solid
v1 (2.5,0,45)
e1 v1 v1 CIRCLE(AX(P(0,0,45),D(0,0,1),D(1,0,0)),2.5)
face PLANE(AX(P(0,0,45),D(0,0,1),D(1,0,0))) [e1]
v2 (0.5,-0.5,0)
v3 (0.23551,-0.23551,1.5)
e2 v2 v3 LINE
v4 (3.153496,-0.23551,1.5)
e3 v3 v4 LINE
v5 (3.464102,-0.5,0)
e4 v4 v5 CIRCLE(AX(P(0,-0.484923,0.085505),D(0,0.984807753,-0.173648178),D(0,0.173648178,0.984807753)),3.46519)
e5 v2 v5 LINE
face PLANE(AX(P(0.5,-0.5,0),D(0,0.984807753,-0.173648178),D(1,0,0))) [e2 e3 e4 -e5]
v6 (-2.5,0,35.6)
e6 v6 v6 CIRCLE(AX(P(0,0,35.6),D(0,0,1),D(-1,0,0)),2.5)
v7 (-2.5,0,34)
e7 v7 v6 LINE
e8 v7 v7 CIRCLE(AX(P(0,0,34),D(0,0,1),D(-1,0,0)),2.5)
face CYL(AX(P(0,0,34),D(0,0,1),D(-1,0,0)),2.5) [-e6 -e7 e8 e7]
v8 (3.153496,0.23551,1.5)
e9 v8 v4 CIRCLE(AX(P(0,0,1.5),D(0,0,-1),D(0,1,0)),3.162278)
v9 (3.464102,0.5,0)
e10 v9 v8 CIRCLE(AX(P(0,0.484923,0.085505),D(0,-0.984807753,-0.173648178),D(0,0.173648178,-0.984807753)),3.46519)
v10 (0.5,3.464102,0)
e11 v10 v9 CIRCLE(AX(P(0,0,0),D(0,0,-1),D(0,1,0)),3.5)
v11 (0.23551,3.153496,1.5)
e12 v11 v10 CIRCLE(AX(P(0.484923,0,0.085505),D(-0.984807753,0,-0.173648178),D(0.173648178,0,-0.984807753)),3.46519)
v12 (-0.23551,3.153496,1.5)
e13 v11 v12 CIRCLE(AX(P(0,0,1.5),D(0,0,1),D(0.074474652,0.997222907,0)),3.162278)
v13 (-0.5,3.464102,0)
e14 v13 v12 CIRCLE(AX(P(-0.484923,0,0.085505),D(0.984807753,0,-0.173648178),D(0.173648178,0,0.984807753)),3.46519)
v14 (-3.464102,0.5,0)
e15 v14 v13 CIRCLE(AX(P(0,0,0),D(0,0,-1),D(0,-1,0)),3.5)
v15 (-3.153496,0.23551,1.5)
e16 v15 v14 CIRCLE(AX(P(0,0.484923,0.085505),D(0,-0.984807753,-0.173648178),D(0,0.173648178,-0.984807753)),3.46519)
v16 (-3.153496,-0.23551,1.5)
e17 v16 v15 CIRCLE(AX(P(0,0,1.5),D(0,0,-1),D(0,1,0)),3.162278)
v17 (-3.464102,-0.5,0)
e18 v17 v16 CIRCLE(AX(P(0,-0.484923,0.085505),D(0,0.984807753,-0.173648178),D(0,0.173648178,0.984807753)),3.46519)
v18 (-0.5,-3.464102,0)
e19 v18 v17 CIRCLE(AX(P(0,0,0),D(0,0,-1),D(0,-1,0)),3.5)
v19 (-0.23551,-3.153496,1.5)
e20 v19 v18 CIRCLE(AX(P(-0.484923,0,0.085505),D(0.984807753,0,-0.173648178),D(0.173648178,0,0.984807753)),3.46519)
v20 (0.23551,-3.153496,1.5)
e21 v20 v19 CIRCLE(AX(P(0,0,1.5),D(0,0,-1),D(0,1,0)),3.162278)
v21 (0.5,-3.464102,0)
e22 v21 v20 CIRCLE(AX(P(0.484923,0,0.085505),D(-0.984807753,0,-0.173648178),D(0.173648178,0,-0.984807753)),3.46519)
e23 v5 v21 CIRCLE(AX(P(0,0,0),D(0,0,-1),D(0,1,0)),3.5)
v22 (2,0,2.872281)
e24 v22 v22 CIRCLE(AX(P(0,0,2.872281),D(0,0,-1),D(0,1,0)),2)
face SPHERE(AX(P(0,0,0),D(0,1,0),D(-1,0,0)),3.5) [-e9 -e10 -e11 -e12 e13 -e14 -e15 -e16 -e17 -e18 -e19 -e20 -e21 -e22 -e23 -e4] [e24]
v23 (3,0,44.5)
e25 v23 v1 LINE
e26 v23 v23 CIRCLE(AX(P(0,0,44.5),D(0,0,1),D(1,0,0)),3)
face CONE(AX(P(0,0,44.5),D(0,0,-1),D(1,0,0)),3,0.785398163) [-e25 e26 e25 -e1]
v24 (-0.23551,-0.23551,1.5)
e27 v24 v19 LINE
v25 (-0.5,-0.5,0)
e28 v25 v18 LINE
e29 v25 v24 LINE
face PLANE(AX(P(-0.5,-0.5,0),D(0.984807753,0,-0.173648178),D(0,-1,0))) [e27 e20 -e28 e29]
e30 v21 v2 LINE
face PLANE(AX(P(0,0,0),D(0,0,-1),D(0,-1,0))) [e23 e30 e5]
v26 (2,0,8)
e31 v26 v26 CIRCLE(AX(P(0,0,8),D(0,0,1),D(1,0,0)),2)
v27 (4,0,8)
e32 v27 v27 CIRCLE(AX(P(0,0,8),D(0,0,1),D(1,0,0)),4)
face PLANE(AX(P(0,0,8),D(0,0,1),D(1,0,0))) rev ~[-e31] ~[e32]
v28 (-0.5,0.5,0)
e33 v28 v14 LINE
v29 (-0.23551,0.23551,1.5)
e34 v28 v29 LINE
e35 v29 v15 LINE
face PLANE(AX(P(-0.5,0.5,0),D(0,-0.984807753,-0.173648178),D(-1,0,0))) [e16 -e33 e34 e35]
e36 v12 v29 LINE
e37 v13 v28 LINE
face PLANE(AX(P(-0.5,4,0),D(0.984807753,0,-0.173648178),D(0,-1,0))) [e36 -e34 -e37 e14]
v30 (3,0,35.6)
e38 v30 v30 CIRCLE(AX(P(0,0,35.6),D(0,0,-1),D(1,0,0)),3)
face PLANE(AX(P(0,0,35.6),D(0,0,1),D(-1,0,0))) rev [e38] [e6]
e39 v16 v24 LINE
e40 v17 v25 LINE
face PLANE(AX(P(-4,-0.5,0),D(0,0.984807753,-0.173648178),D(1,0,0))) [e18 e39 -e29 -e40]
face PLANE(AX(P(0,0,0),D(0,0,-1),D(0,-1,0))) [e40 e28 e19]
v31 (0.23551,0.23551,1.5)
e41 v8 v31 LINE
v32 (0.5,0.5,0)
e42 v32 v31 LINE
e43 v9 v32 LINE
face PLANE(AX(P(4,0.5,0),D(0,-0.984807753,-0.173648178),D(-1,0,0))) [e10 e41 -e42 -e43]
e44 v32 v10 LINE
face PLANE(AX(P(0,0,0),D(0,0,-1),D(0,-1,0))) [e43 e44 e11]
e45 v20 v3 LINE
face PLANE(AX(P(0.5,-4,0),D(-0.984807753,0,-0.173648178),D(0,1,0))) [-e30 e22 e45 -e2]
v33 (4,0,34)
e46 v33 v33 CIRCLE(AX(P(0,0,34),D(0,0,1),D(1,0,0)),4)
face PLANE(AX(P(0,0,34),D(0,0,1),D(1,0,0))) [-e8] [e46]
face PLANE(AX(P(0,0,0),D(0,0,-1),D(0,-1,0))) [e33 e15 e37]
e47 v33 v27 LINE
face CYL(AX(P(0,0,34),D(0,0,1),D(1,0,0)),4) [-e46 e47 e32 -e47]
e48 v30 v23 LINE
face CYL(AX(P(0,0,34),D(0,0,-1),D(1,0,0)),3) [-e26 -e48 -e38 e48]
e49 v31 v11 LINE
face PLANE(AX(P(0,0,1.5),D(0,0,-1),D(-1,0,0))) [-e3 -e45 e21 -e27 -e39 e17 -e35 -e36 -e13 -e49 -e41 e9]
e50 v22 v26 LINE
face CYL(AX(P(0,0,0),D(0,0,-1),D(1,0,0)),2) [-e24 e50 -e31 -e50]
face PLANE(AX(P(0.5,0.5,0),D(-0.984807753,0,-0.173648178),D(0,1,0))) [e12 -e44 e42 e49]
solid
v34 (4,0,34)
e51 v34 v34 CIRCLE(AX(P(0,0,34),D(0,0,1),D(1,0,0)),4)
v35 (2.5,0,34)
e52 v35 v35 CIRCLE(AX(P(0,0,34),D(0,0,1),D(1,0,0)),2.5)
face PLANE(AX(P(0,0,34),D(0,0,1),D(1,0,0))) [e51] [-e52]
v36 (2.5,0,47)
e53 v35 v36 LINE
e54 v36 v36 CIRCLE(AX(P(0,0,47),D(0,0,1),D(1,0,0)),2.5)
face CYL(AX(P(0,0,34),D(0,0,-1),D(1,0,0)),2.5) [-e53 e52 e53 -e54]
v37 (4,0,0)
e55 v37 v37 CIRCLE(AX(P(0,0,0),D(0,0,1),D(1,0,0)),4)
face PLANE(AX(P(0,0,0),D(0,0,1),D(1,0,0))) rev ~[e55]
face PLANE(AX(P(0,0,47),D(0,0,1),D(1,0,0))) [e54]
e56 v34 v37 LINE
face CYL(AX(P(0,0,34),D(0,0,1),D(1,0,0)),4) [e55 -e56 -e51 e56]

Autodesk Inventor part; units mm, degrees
ref_plane "YZ Plane" through (0, 0, 0) normal (1, 0, 0) x (0, 1, 0)
ref_plane "XZ Plane" through (0, 0, 0) normal (0, 1, 0) x (-1, 0, 0)
sketch "Sketch1" plane through (0, 0, 0) normal (0, 0, 1) x (1, 0, 0)
  circle A0 centre (0, 0) radius 2
  dimension "d0" = 4
extrude "Extrusion1" add sketch "Sketch1" along normal blind 34
sketch "Sketch2" plane through (0, 0, 0) normal (0, 0, -1) x (-1, 0, 0)
  circle A0 centre (0, 0) radius 2 projected
  circle A1 centre (0, 0) radius 3.5
  line L0 (0, -3.5) -> (0, 3.5)
  dimension "d3" = 7
revolve "Revolution1" add sketch "Sketch2" angle 360 about axis through (0, -3.5, 0) along (0, 1, 0) picked at (0.41566, 0.521221) picked at (2.954035, -0.407955) contours A0 L0 | A0 L0 A1
split "Split1" plane through (0, 0, 0) removes the side toward (0, 0, -1)
sketch "Sketch3" plane through (0, 0, 34) normal (0, 0, 1) x (1, 0, 0)
  circle A0 centre (0, 0) radius 2 projected
  circle A1 centre (0, 0) radius 4
  dimension "d5" = 8
ref_plane "Work Plane1" through (0, 0, 8) normal (0, 0, -1) x (-1, 0, 0)
extrude "Extrusion2" add sketch "Sketch3" against normal up to surface (26 mm away)
sketch "Sketch4" plane through (0, 0, 34) normal (0, 0, 1) x (1, 0, 0)
  circle A0 centre (0, 0) radius 4 projected
  circle A1 centre (0, 0) radius 3
  dimension "d9" = 6
extrude "Extrusion3" add sketch "Sketch4" along normal blind 11 contours A1
sketch "Sketch5" plane through (0, 0, 0) normal (0, 1, 0) x (-1, 0, 0)
  line L0 (3, 34) -> (3, 45) projected
  line L1 (-3, 34) -> (3, 34) projected
  line L2 (-4, 34) -> (4, 34) projected
  line L3 (0, -7) -> (0, 42) projected
  line L4 (3, 34) -> (2.5, 34)
  line L5 (2.5, 34) -> (2.5, 35.6)
  line L6 (2.5, 35.6) -> (3, 35.6)
  line L7 (3, 35.6) -> (3, 34)
  point P0 (0, 0)
  dimension "d24" = 1.6
  dimension "d25" = 0.5
revolve "Revolution2" cut sketch "Sketch5" angle 360 about axis through (0, 0, -10) along (0, 0, 1)
chamfer "Chamfer1" distance 0.5 angle 45 1 edges at (-3, 0, 45)
thread "Thread1" size "M6x1" class "6g" standard "ISO Metric profile" full length
sketch "Sketch6" plane through (0, 0, 0) normal (0, 0, -1) x (-1, 0, 0)
  circle A0 centre (0, 0) radius 3.5 projected
  line L0 (-0.5, 4) -> (0.5, 4)
  line L1 (0.5, -4) -> (-0.5, -4)
  line L2 (4, 0.5) -> (4, -0.5)
  line L3 (-4, -0.5) -> (-4, 0.5)
  line L4 (-0.5, -4) -> (-0.5, -0.5)
  line L5 (-0.5, 0.5) -> (-0.5, 4)
  line L6 (-4, 0.5) -> (-0.5, 0.5)
  line L7 (0.5, 0.5) -> (4, 0.5)
  line L8 (0.5, 4) -> (0.5, 0.5)
  line L9 (0.5, -0.5) -> (0.5, -4)
  line L10 (4, -0.5) -> (0.5, -0.5)
  line L11 (-0.5, -0.5) -> (-4, -0.5)
  circle A1 centre (0, 0) radius 4 projected
  point P0 (0, 4)
  point P1 (-4, 0)
  dimension "d20" = 1
sketch "Sketch6 outline for Extrusion4" plane through (0, 0, 0) normal (0, 0, -1) x (-1, 0, 0)
  line L0 (-0.5, 4) -> (0.5, 4)
  line L1 (0.5, 4) -> (0.5, 0.5)
  line L2 (0.5, 0.5) -> (4, 0.5)
  line L3 (4, 0.5) -> (4, -0.5)
  line L4 (4, -0.5) -> (0.5, -0.5)
  line L5 (0.5, -0.5) -> (0.5, -4)
  line L6 (0.5, -4) -> (-0.5, -4)
  line L7 (-0.5, -4) -> (-0.5, -0.5)
  line L8 (-0.5, -0.5) -> (-4, -0.5)
  line L9 (-4, -0.5) -> (-4, 0.5)
  line L10 (-4, 0.5) -> (-0.5, 0.5)
  line L11 (-0.5, 0.5) -> (-0.5, 4)
extrude "Extrusion4" cut sketch "Sketch6 outline for Extrusion4" against normal blind 1.5 draft -10
sketch "Sketch7" plane through (0, 0, 34) normal (0, 0, 1) x (1, 0, 0)
  circle A0 centre (0, 0) radius 4
  dimension "d26" = 8
extrude "Extrusion5" add sketch "Sketch7" against normal blind 34 separate body
sketch "Sketch8" plane through (0, 0, 34) normal (0, 0, 1) x (1, 0, 0)
  circle A0 centre (0, 0) radius 2.5
  dimension "d29" = 5
extrude "Extrusion6" add sketch "Sketch8" along normal blind 13 bodies 2
equation "\"d1\" = Bolt_L"
equation "\"d7\" = Bolt_L"
equation "\"d27\" = Bolt_L"
equation "\"Bolt_L\" = 34"
properties part number "Connecting Pin L24" material "Nickel-Copper Alloy 400"
